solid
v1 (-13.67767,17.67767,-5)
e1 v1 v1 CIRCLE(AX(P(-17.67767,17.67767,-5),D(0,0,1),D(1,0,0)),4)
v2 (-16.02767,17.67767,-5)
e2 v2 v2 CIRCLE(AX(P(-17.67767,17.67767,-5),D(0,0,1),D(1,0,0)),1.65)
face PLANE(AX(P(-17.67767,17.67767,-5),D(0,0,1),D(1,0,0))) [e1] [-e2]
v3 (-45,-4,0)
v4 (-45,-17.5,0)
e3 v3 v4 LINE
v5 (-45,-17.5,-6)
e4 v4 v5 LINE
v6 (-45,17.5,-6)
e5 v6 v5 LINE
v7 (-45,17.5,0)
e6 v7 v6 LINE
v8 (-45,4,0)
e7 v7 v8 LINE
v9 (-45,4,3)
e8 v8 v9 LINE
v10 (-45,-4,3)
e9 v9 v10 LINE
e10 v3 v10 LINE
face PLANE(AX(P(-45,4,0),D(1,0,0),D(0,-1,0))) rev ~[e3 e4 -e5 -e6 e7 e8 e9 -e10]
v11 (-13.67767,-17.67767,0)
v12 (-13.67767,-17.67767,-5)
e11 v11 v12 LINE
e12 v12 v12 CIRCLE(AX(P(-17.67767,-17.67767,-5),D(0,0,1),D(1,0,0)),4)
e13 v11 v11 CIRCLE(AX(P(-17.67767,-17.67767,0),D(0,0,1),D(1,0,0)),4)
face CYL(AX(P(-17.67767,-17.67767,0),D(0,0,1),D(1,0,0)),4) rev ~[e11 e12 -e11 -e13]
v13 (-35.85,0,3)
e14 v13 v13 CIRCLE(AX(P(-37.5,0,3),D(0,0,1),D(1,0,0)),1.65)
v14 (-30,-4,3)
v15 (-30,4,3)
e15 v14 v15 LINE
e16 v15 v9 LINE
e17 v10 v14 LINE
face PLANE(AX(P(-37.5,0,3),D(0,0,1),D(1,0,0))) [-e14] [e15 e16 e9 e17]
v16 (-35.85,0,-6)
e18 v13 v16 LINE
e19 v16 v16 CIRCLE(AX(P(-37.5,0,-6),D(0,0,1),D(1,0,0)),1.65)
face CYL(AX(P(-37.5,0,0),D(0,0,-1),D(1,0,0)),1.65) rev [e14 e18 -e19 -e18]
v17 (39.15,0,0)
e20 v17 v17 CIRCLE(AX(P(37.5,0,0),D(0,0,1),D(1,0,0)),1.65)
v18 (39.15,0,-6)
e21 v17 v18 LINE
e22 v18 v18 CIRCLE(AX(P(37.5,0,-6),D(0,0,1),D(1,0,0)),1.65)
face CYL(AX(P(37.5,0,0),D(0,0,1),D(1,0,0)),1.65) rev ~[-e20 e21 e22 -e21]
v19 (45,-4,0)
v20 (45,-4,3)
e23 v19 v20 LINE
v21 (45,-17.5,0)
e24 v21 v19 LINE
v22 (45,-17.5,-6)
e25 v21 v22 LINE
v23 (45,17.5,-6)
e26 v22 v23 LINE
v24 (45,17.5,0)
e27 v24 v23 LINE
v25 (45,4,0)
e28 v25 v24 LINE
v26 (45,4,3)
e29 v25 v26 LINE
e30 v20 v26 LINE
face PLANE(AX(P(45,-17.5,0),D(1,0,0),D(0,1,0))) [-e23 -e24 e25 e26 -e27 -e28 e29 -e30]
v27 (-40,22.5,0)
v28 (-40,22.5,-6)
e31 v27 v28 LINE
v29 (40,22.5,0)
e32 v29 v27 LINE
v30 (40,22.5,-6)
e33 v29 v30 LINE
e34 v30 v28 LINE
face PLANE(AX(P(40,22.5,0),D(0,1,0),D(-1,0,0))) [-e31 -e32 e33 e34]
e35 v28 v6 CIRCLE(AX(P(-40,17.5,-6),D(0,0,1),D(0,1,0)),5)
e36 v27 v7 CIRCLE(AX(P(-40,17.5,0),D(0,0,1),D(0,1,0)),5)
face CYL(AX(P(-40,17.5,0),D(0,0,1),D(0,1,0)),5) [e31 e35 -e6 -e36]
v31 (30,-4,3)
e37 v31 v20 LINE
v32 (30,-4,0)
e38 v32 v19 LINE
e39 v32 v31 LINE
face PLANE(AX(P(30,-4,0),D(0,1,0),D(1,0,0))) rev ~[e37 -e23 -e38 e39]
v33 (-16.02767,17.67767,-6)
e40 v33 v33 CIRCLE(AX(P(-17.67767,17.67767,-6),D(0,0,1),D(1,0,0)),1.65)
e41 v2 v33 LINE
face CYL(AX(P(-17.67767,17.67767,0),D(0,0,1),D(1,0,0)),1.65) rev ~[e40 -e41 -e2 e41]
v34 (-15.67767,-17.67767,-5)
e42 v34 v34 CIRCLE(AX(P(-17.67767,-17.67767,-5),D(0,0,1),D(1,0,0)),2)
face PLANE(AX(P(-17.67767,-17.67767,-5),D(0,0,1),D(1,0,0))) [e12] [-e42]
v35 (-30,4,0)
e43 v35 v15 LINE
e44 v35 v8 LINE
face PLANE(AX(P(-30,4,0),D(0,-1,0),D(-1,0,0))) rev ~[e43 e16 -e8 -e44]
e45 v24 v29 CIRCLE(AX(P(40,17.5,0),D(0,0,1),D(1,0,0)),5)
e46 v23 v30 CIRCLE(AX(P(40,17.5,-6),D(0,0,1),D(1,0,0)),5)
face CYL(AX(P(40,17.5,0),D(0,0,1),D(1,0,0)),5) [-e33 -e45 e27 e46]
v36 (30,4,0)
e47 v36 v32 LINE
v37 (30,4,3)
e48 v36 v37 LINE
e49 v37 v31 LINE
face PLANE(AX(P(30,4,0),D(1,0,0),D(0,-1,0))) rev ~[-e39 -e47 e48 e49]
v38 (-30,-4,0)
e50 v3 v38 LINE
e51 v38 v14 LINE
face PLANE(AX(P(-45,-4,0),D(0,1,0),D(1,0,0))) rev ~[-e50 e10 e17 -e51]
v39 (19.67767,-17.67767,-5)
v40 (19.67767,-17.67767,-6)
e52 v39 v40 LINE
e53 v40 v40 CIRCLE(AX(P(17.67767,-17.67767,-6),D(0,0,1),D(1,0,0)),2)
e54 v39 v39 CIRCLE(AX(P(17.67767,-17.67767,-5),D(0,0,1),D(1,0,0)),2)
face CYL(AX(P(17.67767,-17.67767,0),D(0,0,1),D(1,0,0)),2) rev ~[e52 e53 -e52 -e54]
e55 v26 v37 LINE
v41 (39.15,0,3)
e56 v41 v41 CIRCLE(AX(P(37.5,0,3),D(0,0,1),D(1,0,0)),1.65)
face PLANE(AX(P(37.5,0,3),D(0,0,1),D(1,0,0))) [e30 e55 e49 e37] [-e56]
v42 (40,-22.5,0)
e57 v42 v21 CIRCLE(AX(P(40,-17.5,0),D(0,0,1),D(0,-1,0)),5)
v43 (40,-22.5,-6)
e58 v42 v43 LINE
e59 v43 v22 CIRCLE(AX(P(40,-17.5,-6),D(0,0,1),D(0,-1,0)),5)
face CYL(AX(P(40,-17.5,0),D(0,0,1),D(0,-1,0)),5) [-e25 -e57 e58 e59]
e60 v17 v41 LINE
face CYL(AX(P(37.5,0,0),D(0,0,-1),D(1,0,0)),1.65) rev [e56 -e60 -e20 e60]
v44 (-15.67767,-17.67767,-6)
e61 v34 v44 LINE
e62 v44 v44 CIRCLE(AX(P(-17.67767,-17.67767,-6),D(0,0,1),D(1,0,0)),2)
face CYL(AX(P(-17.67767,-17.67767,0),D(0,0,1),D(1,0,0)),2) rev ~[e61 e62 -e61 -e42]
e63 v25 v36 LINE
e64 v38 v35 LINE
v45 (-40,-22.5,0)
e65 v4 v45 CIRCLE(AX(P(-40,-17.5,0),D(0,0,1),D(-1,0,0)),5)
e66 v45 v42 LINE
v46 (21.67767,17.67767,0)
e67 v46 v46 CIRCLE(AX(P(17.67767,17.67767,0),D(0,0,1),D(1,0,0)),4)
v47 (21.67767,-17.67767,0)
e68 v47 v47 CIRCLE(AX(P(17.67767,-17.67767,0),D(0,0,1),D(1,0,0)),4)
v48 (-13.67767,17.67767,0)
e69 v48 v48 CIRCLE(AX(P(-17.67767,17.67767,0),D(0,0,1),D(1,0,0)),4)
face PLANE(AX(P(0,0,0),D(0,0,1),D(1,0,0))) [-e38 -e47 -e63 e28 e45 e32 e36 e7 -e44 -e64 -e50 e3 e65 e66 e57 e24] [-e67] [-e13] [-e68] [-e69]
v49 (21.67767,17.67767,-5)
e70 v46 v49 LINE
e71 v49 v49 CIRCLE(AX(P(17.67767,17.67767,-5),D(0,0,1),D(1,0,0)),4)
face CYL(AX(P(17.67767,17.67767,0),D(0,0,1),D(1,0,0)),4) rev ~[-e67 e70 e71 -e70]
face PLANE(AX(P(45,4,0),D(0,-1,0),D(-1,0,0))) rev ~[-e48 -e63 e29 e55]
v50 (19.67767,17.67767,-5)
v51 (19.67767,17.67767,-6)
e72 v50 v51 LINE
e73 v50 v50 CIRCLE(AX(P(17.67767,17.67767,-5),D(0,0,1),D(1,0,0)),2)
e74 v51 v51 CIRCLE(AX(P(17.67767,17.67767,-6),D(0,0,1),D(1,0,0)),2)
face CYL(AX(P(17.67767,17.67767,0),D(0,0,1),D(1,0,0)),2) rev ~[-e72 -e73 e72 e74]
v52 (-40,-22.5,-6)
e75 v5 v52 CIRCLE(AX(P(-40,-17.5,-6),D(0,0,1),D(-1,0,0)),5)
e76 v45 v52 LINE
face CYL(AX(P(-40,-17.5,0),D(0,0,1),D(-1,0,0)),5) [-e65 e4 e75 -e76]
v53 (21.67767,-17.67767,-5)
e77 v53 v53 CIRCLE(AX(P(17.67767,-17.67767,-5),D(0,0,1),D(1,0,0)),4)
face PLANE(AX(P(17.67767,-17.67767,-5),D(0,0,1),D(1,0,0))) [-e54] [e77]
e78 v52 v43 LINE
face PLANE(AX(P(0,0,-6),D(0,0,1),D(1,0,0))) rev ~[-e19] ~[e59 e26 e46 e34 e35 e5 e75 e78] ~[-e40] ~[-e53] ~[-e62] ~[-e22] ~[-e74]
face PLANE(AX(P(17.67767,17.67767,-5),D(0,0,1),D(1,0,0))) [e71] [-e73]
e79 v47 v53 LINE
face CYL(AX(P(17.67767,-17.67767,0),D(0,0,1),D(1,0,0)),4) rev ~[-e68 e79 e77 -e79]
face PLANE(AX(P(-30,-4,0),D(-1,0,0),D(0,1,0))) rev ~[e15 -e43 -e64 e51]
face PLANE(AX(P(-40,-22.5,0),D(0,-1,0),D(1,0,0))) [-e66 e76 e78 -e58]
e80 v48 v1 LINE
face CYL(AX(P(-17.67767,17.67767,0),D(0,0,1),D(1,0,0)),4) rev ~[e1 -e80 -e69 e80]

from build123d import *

# Parameters (mm, degrees)
F0_R     = 4
F0_R_2   = 1.65
F0_R_3   = 2
F1_DEPTH = 6
F2_DEPTH = 5
F3_DEPTH = 3


# Not quite as in the source:
# - a feature names something its author has since deleted; it is built from what else it names


with BuildPart() as f1:
    # F0 (on Top) → F1 (new body)
    with BuildSketch(Plane.XY):
        with BuildLine():
            Line((40, 22.5), (-40, 22.5))
            ThreePointArc((-40, 22.5), (-43.5355339059, 21.0355339059), (-45, 17.5))
            Line((-45, 17.5), (-45, 4))
            Line((-45, 4), (-30, 4))
            Line((-30, 4), (-30, 0))
            Line((-30, 0), (-30, -4))
            Line((-30, -4), (-45, -4))
            Line((-45, -4), (-45, -17.5))
            ThreePointArc((-45, -17.5), (-43.5355339059, -21.0355339059), (-40, -22.5))
            Line((-40, -22.5), (40, -22.5))
            ThreePointArc((40, -22.5), (43.5355339059, -21.0355339059), (45, -17.5))
            Line((45, -17.5), (45, -4))
            Line((45, -4), (30, -4))
            Line((30, -4), (30, 0))
            Line((30, 0), (30, 4))
            Line((30, 4), (45, 4))
            Line((45, 4), (45, 17.5))
            ThreePointArc((45, 17.5), (43.5355339059, 21.0355339059), (40, 22.5))
        make_face()
        with Locations((-17.6776695297, -17.6776695297)):
            Circle(F0_R, mode=Mode.SUBTRACT)
        with Locations((17.6776695297, -17.6776695297)):
            Circle(F0_R, mode=Mode.SUBTRACT)
        with Locations((-17.6776695297, 17.6776695297)):
            Circle(F0_R, mode=Mode.SUBTRACT)
        with Locations((17.6776695297, 17.6776695297)):
            Circle(F0_R, mode=Mode.SUBTRACT)
        Polygon((-30, 4), (-45, 4), (-45, -4), (-30, -4), (-30, 0), align=None)
        with Locations((-37.5, 0)):
            Circle(F0_R_2, mode=Mode.SUBTRACT)
        Polygon((45, -4), (45, 4), (30, 4), (30, 0), (30, -4), align=None)
        with Locations((37.5, 0)):
            Circle(F0_R_2, mode=Mode.SUBTRACT)
        with Locations((-17.6776695297, 17.6776695297)):
            Circle(F0_R)
        with Locations((-17.6776695297, 17.6776695297)):
            Circle(F0_R_2, mode=Mode.SUBTRACT)
        with Locations((-17.6776695297, -17.6776695297)):
            Circle(F0_R)
        with Locations((-17.6776695297, -17.6776695297)):
            Circle(F0_R_3, mode=Mode.SUBTRACT)
        with Locations((17.6776695297, 17.6776695297)):
            Circle(F0_R)
        with Locations((17.6776695297, 17.6776695297)):
            Circle(F0_R_3, mode=Mode.SUBTRACT)
        with Locations((17.6776695297, -17.6776695297)):
            Circle(F0_R)
        with Locations((17.6776695297, -17.6776695297)):
            Circle(F0_R_3, mode=Mode.SUBTRACT)
    extrude(amount=-F1_DEPTH)

    # F0 (on Top) → F2 (cut)
    with BuildSketch(Plane.XY):
        with Locations((-17.6776695297, 17.6776695297)):
            Circle(F0_R)
        with Locations((-17.6776695297, 17.6776695297)):
            Circle(F0_R_2, mode=Mode.SUBTRACT)
        with Locations((-17.6776695297, 17.6776695297)):
            Circle(F0_R_2)
        with Locations((-17.6776695297, -17.6776695297)):
            Circle(F0_R)
        with Locations((-17.6776695297, -17.6776695297)):
            Circle(F0_R_3, mode=Mode.SUBTRACT)
        with Locations((17.6776695297, -17.6776695297)):
            Circle(F0_R)
        with Locations((17.6776695297, -17.6776695297)):
            Circle(F0_R_3, mode=Mode.SUBTRACT)
        with Locations((17.6776695297, 17.6776695297)):
            Circle(F0_R)
        with Locations((17.6776695297, 17.6776695297)):
            Circle(F0_R_3, mode=Mode.SUBTRACT)
    extrude(amount=-F2_DEPTH, mode=Mode.SUBTRACT)

    # F0 (on Top) → F3 (join)
    with BuildSketch(Plane.XY):
        Polygon((-30, 4), (-45, 4), (-45, -4), (-30, -4), (-30, 0), align=None)
        with Locations((-37.5, 0)):
            Circle(F0_R_2, mode=Mode.SUBTRACT)
        Polygon((45, -4), (45, 4), (30, 4), (30, 0), (30, -4), align=None)
        with Locations((37.5, 0)):
            Circle(F0_R_2, mode=Mode.SUBTRACT)
    extrude(amount=F3_DEPTH)


solid = f1.part
